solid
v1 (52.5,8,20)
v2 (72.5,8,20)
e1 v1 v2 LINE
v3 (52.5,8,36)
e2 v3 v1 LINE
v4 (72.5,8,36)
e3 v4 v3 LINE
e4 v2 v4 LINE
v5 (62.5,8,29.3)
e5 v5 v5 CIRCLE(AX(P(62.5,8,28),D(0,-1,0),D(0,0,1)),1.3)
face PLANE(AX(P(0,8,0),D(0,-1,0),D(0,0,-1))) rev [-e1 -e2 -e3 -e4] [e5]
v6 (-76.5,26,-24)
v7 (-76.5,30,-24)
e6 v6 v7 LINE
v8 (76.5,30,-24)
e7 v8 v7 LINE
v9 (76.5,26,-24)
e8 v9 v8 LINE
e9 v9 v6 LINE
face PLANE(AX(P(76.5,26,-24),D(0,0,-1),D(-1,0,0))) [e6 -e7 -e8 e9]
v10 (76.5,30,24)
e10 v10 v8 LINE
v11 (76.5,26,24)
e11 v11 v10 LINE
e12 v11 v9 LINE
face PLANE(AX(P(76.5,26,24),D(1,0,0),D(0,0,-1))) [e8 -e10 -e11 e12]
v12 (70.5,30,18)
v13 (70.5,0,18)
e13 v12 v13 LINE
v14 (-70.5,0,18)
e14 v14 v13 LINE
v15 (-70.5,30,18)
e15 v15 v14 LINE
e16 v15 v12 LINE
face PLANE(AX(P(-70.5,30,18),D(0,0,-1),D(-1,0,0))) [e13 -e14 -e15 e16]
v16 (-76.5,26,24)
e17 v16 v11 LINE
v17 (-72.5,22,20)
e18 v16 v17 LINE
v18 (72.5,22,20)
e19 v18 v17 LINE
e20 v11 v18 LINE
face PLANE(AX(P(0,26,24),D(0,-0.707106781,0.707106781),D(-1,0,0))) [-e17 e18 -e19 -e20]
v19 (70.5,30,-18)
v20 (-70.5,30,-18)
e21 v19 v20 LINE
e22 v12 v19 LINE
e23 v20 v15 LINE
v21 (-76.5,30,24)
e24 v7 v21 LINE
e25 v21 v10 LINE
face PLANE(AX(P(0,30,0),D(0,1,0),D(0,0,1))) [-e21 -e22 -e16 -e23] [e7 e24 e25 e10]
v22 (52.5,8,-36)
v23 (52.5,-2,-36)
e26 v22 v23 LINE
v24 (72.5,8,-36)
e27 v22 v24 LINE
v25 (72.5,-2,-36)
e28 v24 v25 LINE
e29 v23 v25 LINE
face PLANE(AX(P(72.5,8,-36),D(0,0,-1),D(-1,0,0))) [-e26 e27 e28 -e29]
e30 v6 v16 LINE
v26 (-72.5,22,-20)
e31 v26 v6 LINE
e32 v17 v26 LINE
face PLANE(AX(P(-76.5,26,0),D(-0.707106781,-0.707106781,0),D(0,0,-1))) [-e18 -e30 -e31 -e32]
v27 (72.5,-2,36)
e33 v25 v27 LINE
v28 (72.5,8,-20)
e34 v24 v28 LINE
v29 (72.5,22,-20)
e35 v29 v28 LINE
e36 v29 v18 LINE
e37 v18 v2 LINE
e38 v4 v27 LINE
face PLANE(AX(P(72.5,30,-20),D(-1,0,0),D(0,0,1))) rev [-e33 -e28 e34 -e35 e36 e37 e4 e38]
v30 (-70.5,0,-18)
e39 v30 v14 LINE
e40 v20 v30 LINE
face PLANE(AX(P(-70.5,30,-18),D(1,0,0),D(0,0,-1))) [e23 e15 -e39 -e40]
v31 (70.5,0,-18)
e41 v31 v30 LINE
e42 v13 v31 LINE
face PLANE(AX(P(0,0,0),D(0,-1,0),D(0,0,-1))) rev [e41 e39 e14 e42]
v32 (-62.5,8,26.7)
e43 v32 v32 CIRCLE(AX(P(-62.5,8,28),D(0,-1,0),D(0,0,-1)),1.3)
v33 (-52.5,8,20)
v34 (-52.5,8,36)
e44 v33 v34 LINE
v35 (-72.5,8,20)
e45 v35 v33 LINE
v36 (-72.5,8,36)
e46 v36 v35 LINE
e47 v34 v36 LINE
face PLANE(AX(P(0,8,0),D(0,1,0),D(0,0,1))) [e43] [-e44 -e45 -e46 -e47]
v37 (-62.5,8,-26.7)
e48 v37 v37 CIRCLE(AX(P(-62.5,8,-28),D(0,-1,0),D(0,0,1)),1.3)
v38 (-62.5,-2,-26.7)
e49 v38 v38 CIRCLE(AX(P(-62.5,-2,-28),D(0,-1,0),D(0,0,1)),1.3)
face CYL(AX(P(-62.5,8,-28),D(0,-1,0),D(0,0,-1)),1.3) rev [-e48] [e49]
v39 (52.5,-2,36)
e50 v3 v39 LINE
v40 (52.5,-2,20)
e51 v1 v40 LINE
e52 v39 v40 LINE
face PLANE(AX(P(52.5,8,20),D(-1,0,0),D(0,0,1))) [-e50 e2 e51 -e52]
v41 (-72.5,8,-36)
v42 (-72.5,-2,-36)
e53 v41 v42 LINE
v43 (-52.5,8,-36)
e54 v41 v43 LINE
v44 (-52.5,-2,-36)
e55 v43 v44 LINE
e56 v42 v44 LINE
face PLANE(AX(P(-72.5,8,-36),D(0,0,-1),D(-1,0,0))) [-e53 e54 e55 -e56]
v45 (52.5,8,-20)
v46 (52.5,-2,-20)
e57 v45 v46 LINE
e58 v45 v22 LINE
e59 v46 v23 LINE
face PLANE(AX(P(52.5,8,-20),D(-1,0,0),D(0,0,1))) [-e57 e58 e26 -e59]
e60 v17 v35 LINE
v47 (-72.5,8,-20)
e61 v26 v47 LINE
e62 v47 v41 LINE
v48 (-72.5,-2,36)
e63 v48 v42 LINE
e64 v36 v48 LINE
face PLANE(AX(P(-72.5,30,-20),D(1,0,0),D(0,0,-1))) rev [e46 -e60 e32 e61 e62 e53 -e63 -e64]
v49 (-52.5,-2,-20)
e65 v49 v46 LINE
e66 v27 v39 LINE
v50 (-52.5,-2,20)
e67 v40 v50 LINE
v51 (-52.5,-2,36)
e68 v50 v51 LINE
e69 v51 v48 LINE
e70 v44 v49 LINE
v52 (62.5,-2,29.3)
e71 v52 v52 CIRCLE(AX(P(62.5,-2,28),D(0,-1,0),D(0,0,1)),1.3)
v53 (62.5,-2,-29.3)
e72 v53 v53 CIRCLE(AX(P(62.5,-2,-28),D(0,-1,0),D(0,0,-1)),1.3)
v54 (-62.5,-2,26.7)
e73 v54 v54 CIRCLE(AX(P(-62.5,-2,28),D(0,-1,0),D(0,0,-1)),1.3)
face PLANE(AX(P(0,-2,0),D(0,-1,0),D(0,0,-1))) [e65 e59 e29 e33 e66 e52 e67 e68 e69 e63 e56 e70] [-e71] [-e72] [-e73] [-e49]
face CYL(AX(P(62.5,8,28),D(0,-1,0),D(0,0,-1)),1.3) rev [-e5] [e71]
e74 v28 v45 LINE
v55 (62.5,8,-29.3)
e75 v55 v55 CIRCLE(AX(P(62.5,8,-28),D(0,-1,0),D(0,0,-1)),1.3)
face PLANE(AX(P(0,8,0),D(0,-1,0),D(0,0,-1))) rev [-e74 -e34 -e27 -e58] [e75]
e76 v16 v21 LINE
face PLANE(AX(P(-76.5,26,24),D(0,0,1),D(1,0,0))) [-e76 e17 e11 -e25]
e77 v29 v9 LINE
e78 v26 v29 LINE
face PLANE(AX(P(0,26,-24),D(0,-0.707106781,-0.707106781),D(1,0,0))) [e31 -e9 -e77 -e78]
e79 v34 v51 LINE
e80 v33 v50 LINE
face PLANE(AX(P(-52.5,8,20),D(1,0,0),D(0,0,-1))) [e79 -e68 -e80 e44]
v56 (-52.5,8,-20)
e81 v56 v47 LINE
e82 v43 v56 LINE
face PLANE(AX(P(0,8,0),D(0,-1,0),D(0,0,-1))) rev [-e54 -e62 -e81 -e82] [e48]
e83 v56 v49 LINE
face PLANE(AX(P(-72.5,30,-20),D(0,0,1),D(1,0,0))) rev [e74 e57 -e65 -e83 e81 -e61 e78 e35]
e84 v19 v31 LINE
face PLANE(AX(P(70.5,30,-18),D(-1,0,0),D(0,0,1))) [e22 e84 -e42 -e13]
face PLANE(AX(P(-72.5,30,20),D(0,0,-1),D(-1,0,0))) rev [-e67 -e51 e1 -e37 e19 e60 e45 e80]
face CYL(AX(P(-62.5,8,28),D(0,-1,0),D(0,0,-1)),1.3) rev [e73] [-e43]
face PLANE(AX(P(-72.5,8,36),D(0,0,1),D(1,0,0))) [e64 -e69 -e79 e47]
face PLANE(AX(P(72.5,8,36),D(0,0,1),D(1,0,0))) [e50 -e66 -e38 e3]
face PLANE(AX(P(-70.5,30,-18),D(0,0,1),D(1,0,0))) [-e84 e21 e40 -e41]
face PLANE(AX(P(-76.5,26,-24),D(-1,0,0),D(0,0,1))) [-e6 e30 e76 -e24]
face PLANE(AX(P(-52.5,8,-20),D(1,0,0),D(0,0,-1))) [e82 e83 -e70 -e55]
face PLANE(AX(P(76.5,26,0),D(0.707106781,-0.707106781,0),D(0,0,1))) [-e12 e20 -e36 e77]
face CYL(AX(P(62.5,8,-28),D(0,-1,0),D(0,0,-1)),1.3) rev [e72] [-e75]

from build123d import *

# Parameters (mm, degrees)
SKETCH1_W           = 145
SKETCH1_H           = 40
SKETCH1_W_2         = 141
SKETCH1_H_2         = 36
BOSS_EXTRUDE1_DEPTH = 30
SKETCH2_W           = 145
SKETCH2_H           = 40
BOSS_EXTRUDE2_DEPTH = 2
SKETCH3_W           = 153
SKETCH3_H           = 48
SKETCH3_W_2         = 145
SKETCH3_H_2         = 40
BOSS_EXTRUDE3_DEPTH = 4
CHAMFER1_SIZE       = 4
SKETCH4_W           = 20
SKETCH4_H           = 16
SKETCH4_R           = 1.3
BOSS_EXTRUDE4_DEPTH = 10


with BuildPart() as part:
    # Sketch1 → Boss-Extrude1 (new body)
    with BuildSketch(Plane(origin=(0, 0, 0), x_dir=(1, 0, 0), z_dir=(0, 1, 0))):
        Rectangle(SKETCH1_W, SKETCH1_H)
        Rectangle(SKETCH1_W_2, SKETCH1_H_2, mode=Mode.SUBTRACT)
    extrude(amount=BOSS_EXTRUDE1_DEPTH)

    # Sketch2 → Boss-Extrude2 (add)
    with BuildSketch(Plane.XZ):
        Rectangle(SKETCH2_W, SKETCH2_H)
    extrude(amount=BOSS_EXTRUDE2_DEPTH)

    # Sketch3 → Boss-Extrude3 (add)
    with BuildSketch(Plane(origin=(0, 30, 0), x_dir=(1, 0, 0), z_dir=(0, 1, 0))):
        Rectangle(SKETCH3_W, SKETCH3_H)
        Rectangle(SKETCH3_W_2, SKETCH3_H_2, mode=Mode.SUBTRACT)
    extrude(amount=-BOSS_EXTRUDE3_DEPTH)

    # Chamfer1
    chamfer1_edges = [part.edges().sort_by_distance(p)[0] for p in [
        (-72.5, 26, 0),
        (0, 26, 20),
        (72.5, 26, 0),
        (0, 26, -20),
    ]]
    chamfer(chamfer1_edges, length=CHAMFER1_SIZE - 0.0001)  # a hair under: the kernel refuses the full size

    # Sketch4 → Boss-Extrude4 (add)
    # profile 1 of 4: a face of its own
    with BuildSketch(Plane.XZ.offset(2)):
        with Locations((62.5, 28)):
            Rectangle(SKETCH4_W, SKETCH4_H)
        with Locations(Location((62.5, 28, 0), (0, 0, 90))):
            Circle(SKETCH4_R, mode=Mode.SUBTRACT)
    # profile 2 of 4: a face of its own
    with BuildSketch(Plane.XZ.offset(2)):
        with Locations((-62.5, 28)):
            Rectangle(SKETCH4_W, SKETCH4_H)
        with Locations(Location((-62.5, 28, 0), (0, 0, 270))):
            Circle(SKETCH4_R, mode=Mode.SUBTRACT)
    # profile 3 of 4: a face of its own
    with BuildSketch(Plane.XZ.offset(2)):
        with Locations((-62.5, -28)):
            Rectangle(SKETCH4_W, SKETCH4_H)
        with Locations(Location((-62.5, -28, 0), (0, 0, 90))):
            Circle(SKETCH4_R, mode=Mode.SUBTRACT)
    # profile 4 of 4: a face of its own
    with BuildSketch(Plane.XZ.offset(2)):
        with Locations((62.5, -28)):
            Rectangle(SKETCH4_W, SKETCH4_H)
        with Locations(Location((62.5, -28, 0), (0, 0, 270))):
            Circle(SKETCH4_R, mode=Mode.SUBTRACT)
    extrude(amount=-BOSS_EXTRUDE4_DEPTH)


solid = part.part
